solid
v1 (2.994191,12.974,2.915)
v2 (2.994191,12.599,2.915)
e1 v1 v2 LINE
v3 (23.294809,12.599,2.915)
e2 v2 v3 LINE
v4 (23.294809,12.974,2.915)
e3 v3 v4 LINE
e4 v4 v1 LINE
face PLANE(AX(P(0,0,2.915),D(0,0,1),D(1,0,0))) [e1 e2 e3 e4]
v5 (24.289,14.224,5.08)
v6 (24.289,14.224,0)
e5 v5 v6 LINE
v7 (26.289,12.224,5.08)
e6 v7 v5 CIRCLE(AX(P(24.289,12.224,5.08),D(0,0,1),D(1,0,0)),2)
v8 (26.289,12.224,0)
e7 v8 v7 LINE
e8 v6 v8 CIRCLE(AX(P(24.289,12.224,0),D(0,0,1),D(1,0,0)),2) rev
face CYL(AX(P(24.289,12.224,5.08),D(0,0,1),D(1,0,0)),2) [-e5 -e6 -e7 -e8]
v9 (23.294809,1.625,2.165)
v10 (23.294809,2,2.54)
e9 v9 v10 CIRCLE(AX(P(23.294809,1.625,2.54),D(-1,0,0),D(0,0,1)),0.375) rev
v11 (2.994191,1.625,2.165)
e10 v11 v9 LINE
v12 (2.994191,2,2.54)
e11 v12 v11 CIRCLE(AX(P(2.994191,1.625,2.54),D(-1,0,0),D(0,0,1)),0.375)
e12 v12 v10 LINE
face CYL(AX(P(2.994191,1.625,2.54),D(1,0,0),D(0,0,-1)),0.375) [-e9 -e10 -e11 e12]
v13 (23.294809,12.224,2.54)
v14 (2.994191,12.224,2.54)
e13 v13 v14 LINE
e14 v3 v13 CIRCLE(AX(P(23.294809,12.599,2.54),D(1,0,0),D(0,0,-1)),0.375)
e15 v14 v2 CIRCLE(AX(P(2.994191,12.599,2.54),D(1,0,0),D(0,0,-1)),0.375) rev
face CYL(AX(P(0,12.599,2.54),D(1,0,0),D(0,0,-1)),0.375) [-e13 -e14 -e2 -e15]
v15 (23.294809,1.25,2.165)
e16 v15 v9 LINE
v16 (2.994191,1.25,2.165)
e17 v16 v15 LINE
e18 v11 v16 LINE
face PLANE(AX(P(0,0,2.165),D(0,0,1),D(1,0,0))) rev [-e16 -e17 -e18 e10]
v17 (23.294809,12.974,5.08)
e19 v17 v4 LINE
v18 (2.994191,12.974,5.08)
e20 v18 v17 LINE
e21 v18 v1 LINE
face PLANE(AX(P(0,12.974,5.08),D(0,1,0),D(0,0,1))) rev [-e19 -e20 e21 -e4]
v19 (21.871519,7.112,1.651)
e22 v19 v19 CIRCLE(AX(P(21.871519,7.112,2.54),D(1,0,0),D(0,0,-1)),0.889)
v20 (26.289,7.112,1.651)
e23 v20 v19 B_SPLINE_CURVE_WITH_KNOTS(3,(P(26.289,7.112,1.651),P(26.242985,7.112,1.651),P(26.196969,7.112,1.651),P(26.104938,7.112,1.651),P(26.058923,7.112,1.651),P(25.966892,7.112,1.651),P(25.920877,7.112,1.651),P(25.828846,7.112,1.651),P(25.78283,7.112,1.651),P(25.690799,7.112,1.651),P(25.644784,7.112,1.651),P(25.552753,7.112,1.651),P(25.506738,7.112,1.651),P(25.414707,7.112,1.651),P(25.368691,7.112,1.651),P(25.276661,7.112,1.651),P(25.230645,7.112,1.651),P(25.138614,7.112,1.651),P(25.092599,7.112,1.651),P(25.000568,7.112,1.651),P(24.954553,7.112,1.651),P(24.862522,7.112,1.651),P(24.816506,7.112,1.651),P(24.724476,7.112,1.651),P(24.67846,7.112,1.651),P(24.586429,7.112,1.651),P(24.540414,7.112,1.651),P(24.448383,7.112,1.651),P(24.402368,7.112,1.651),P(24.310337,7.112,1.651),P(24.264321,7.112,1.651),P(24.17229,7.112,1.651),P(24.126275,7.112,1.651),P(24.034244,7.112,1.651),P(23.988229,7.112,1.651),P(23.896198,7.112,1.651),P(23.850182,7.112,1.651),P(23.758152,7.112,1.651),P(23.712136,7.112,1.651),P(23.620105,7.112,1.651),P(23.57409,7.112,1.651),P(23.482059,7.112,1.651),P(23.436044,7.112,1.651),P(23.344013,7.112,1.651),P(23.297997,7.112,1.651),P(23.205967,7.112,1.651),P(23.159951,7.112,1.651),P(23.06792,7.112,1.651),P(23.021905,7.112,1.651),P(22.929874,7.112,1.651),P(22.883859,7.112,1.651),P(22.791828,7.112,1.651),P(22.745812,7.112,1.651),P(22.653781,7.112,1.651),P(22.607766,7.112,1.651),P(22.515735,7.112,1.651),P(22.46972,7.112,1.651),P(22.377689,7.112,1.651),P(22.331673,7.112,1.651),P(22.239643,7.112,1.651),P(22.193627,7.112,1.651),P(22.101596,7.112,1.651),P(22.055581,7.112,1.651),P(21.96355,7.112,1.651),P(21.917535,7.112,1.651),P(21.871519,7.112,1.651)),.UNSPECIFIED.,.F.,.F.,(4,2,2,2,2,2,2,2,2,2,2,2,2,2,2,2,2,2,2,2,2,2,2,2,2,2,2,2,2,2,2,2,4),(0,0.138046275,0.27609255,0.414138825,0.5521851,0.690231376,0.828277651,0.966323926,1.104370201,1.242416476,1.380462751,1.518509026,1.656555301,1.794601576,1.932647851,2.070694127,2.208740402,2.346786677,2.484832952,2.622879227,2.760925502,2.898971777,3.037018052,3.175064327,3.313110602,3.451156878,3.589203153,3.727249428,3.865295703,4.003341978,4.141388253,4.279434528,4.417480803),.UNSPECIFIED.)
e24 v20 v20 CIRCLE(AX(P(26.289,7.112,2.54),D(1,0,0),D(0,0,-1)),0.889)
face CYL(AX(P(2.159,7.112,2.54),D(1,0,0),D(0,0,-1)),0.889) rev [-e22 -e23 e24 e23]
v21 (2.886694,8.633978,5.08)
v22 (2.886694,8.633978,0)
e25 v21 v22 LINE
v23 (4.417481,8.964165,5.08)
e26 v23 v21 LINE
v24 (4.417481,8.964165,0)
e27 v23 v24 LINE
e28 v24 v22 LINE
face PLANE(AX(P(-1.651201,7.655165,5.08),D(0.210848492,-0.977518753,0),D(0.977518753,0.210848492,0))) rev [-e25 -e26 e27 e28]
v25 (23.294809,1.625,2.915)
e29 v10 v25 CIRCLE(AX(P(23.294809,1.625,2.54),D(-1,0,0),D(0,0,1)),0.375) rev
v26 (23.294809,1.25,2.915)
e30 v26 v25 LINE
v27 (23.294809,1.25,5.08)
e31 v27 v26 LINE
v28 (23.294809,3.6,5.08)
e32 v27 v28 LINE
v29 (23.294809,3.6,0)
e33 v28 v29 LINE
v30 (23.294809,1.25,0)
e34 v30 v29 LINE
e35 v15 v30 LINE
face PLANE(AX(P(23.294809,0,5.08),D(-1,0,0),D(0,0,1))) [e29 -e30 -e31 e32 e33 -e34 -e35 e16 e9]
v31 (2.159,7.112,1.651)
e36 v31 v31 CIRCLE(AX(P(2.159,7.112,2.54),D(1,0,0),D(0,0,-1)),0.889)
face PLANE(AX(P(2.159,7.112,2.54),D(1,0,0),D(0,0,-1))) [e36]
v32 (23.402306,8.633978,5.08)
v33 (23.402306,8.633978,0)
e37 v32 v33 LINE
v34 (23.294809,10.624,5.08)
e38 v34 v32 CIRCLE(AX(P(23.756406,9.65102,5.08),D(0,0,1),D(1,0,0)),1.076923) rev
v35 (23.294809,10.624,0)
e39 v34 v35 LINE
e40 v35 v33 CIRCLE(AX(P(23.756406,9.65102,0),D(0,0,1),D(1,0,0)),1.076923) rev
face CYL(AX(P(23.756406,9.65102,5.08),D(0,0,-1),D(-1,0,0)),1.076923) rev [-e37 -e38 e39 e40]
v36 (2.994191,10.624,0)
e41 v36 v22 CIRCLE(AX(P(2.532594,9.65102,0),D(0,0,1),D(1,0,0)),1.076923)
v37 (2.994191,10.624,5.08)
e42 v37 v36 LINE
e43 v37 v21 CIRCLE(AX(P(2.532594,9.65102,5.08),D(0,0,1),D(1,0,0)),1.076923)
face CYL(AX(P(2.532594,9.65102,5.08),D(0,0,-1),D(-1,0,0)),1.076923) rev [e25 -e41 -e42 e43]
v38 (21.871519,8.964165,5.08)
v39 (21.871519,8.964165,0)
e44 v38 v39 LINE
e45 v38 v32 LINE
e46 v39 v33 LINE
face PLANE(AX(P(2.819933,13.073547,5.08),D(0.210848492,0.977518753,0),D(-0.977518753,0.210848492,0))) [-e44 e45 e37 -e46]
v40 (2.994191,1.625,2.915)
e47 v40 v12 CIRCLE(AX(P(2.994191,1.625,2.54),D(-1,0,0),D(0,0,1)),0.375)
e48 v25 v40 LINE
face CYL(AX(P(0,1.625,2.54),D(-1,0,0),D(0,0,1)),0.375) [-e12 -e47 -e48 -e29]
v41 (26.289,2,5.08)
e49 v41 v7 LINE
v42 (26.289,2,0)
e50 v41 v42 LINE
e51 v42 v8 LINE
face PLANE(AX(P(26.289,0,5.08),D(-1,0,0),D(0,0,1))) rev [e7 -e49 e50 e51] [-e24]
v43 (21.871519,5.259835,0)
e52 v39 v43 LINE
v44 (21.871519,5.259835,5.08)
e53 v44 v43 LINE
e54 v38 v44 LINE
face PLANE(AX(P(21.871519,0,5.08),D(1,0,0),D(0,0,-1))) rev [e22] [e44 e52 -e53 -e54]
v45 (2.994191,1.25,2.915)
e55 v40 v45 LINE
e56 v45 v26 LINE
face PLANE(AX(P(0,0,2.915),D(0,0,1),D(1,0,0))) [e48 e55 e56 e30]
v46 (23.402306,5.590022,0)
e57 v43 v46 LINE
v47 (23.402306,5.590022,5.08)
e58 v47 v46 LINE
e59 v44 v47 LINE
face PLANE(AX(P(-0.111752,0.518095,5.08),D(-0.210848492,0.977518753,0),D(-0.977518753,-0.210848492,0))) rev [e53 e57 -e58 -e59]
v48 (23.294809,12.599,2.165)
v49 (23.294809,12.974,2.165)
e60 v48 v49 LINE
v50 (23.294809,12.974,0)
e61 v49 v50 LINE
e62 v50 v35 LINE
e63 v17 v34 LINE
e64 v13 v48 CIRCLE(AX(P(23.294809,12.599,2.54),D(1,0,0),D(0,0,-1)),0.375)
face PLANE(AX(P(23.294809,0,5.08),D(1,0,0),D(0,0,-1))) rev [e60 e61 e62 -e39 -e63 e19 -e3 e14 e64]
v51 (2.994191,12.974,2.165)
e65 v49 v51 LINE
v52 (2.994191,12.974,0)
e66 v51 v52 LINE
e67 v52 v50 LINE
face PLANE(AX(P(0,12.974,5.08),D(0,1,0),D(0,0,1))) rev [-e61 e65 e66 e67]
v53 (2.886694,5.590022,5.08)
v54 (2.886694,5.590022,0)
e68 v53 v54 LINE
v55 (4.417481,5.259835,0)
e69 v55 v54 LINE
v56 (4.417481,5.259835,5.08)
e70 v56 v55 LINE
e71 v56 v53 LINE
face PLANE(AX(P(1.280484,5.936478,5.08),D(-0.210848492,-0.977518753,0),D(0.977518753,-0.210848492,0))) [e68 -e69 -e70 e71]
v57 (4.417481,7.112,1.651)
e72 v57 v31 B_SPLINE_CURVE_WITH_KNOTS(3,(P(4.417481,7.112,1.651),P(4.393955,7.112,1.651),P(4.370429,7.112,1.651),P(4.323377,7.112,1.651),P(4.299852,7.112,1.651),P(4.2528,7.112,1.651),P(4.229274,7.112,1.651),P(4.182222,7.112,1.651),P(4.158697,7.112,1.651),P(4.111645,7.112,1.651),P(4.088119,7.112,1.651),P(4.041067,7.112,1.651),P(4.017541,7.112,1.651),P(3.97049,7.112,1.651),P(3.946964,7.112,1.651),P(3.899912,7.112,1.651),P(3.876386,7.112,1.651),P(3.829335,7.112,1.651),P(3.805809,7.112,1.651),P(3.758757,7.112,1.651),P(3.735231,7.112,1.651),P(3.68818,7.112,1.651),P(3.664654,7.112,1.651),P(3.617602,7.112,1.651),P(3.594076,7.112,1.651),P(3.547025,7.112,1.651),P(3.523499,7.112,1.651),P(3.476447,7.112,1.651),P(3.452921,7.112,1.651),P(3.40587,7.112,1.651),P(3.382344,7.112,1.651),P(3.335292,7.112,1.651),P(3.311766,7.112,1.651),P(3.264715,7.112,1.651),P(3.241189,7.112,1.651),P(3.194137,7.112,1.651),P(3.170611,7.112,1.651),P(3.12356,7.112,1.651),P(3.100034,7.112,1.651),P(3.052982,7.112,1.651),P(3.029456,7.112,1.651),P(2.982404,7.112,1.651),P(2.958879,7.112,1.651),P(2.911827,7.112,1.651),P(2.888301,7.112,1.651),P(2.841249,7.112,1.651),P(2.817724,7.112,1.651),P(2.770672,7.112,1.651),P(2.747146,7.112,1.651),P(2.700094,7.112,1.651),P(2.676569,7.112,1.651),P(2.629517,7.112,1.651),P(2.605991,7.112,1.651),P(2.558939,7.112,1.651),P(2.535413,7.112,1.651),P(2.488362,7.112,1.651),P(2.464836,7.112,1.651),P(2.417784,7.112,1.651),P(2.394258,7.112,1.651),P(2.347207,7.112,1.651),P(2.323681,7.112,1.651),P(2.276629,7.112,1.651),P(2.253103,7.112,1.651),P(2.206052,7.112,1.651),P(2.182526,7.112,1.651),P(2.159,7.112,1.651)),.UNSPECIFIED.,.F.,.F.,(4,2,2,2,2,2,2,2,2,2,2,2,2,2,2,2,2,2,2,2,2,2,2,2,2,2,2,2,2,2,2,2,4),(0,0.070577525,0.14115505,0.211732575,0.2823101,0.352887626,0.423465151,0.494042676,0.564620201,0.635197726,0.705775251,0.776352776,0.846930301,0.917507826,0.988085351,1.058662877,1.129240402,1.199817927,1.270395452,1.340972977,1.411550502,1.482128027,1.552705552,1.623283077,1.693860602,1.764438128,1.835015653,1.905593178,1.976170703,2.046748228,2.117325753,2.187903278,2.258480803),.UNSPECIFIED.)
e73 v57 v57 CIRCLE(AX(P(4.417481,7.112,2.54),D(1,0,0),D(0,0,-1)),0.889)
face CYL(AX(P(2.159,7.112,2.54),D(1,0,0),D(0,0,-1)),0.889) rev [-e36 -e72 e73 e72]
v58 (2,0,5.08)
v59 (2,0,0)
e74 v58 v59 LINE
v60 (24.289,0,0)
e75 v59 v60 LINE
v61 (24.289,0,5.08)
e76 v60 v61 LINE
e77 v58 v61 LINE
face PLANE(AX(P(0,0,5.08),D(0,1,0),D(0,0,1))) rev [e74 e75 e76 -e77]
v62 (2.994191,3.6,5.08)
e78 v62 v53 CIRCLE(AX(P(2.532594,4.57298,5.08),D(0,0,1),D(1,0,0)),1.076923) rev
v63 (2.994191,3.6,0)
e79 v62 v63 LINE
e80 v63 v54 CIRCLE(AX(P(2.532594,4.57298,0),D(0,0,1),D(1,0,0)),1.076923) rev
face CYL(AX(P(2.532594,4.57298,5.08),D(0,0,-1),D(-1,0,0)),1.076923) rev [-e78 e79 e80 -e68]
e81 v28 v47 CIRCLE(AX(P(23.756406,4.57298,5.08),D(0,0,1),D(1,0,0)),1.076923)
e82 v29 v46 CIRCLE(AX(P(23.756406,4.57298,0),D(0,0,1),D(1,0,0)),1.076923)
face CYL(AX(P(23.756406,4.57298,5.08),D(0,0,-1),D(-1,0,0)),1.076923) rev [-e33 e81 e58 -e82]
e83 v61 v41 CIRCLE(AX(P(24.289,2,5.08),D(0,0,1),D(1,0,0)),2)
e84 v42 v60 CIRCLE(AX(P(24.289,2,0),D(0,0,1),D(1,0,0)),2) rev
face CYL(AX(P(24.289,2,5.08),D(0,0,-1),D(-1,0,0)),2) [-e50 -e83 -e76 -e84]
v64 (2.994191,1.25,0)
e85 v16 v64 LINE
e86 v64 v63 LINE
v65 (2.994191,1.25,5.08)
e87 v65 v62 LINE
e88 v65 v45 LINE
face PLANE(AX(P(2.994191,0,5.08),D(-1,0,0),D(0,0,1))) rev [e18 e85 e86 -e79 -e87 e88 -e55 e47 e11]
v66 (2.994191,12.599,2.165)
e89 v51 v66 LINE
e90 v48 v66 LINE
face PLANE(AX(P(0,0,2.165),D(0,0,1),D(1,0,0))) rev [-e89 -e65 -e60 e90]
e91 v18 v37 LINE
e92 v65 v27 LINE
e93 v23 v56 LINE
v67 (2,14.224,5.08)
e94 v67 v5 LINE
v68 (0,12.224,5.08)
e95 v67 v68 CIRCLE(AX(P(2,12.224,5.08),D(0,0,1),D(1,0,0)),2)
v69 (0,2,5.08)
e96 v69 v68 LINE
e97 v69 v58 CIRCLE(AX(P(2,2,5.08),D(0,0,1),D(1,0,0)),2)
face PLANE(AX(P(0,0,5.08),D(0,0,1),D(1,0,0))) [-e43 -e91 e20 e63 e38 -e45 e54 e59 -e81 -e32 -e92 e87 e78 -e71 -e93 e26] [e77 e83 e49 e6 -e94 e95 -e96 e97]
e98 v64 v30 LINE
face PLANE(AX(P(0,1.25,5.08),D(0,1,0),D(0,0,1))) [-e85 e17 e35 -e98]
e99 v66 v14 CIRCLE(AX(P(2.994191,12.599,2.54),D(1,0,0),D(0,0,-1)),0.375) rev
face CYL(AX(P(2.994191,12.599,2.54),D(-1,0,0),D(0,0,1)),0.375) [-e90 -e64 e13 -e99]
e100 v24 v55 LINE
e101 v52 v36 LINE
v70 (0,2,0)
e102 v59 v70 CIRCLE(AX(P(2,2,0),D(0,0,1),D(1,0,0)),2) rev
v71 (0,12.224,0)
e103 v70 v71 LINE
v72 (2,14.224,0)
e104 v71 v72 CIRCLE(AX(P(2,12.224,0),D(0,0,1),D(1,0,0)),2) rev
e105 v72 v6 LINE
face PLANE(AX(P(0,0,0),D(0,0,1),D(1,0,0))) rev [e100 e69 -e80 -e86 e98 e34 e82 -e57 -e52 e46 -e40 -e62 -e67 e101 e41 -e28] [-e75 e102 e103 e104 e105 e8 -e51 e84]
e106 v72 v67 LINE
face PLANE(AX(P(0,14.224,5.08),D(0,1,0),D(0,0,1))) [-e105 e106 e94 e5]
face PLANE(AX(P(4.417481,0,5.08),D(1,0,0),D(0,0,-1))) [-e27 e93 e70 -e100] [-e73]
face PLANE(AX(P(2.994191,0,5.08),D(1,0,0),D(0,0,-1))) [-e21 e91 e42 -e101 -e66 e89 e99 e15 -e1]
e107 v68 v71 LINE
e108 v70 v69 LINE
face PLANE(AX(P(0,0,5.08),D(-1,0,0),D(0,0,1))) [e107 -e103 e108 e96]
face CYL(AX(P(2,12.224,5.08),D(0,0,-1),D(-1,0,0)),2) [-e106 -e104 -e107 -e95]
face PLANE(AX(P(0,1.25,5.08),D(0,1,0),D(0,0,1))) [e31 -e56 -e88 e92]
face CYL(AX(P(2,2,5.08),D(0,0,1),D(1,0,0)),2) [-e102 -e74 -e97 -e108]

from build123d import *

# Parameters (mm, degrees)
SKETCH1_W                = 26.289
SKETCH1_H                = 14.224
BOSS_EXTRUDE1_DEPTH      = 5.08
BOSS_EXTRUDE2_DEPTH      = 0.375
BOSS_EXTRUDE2_DEPTH_BACK = 0.375
SKETCH2_W                = 20.300617312
SKETCH2_H                = 0.75
FILLET1_R                = 0.375
FILLET2_R                = 2
SKETCH3_R                = 0.889
CUT_EXTRUDE1_DEPTH       = 24.13


with BuildPart() as part:
    # Sketch1 → Boss-Extrude1 (new body)
    with BuildSketch(Plane.XY):
        with Locations((13.1445, 7.112)):
            Rectangle(SKETCH1_W, SKETCH1_H)
        with BuildLine():
            ThreePointArc((2.994191344, 10.624), (1.457238853, 9.709108648), (2.886694423, 8.633977996))
            Line((2.886694423, 8.633977996), (4.417480803, 8.964165012))
            Line((4.417480803, 8.964165012), (4.417480803, 5.259834988))
            Line((4.417480803, 5.259834988), (2.886694423, 5.590022004))
            ThreePointArc((2.886694423, 5.590022004), (1.457238853, 4.514891352), (2.994191344, 3.6))
            Line((2.994191344, 3.6), (2.994191344, 1.25))
            Line((2.994191344, 1.25), (23.294808656, 1.25))
            Line((23.294808656, 1.25), (23.294808656, 3.6))
            ThreePointArc((23.294808656, 3.6), (24.831761147, 4.514891352), (23.402305577, 5.590022004))
            Line((23.402305577, 5.590022004), (21.871519197, 5.259834988))
            Line((21.871519197, 5.259834988), (21.871519197, 8.964165012))
            Line((21.871519197, 8.964165012), (23.402305577, 8.633977996))
            ThreePointArc((23.402305577, 8.633977996), (24.831761147, 9.709108648), (23.294808656, 10.624))
            Line((23.294808656, 10.624), (23.294808656, 12.974))
            Line((23.294808656, 12.974), (2.994191344, 12.974))
            Line((2.994191344, 12.974), (2.994191344, 10.624))
        make_face(mode=Mode.SUBTRACT)
    extrude(amount=BOSS_EXTRUDE1_DEPTH)

    # Sketch2 → Boss-Extrude2 (add, two sides: drawn at the far end of the back side and taken through both)
    with BuildSketch(Plane.XY.offset(2.54).offset(-BOSS_EXTRUDE2_DEPTH_BACK)):
        with Locations((13.1445, 1.625)):
            Rectangle(SKETCH2_W, SKETCH2_H)
        with Locations((13.1445, 12.599)):
            Rectangle(SKETCH2_W, SKETCH2_H)
    extrude(amount=BOSS_EXTRUDE2_DEPTH + BOSS_EXTRUDE2_DEPTH_BACK)

    # Fillet1
    fillet1_edges = [part.edges().sort_by_distance(p)[0] for p in [
        (13.1445, 12.224, 2.165),
        (13.1445, 12.224, 2.915),
        (13.1445, 2, 2.165),
        (13.1445, 2, 2.915),
    ]]
    fillet(fillet1_edges, radius=FILLET1_R - 0.0001)  # a hair under: the kernel refuses the full size

    # Fillet2
    fillet2_edges = [part.edges().sort_by_distance(p)[0] for p in [
        (0, 0, 2.54),
        (0, 14.224, 2.54),
        (26.289, 14.224, 2.54),
        (26.289, 0, 2.54),
    ]]
    fillet(fillet2_edges, radius=FILLET2_R)

    # Sketch3 → Cut-Extrude1 (cut)
    with BuildSketch(Plane(origin=(26.289, 0, 0), x_dir=(0, 0, -1), z_dir=(1, 0, 0))):
        with Locations((-2.54, 7.112)):
            Circle(SKETCH3_R)
    extrude(amount=-CUT_EXTRUDE1_DEPTH, mode=Mode.SUBTRACT)


solid = part.part
